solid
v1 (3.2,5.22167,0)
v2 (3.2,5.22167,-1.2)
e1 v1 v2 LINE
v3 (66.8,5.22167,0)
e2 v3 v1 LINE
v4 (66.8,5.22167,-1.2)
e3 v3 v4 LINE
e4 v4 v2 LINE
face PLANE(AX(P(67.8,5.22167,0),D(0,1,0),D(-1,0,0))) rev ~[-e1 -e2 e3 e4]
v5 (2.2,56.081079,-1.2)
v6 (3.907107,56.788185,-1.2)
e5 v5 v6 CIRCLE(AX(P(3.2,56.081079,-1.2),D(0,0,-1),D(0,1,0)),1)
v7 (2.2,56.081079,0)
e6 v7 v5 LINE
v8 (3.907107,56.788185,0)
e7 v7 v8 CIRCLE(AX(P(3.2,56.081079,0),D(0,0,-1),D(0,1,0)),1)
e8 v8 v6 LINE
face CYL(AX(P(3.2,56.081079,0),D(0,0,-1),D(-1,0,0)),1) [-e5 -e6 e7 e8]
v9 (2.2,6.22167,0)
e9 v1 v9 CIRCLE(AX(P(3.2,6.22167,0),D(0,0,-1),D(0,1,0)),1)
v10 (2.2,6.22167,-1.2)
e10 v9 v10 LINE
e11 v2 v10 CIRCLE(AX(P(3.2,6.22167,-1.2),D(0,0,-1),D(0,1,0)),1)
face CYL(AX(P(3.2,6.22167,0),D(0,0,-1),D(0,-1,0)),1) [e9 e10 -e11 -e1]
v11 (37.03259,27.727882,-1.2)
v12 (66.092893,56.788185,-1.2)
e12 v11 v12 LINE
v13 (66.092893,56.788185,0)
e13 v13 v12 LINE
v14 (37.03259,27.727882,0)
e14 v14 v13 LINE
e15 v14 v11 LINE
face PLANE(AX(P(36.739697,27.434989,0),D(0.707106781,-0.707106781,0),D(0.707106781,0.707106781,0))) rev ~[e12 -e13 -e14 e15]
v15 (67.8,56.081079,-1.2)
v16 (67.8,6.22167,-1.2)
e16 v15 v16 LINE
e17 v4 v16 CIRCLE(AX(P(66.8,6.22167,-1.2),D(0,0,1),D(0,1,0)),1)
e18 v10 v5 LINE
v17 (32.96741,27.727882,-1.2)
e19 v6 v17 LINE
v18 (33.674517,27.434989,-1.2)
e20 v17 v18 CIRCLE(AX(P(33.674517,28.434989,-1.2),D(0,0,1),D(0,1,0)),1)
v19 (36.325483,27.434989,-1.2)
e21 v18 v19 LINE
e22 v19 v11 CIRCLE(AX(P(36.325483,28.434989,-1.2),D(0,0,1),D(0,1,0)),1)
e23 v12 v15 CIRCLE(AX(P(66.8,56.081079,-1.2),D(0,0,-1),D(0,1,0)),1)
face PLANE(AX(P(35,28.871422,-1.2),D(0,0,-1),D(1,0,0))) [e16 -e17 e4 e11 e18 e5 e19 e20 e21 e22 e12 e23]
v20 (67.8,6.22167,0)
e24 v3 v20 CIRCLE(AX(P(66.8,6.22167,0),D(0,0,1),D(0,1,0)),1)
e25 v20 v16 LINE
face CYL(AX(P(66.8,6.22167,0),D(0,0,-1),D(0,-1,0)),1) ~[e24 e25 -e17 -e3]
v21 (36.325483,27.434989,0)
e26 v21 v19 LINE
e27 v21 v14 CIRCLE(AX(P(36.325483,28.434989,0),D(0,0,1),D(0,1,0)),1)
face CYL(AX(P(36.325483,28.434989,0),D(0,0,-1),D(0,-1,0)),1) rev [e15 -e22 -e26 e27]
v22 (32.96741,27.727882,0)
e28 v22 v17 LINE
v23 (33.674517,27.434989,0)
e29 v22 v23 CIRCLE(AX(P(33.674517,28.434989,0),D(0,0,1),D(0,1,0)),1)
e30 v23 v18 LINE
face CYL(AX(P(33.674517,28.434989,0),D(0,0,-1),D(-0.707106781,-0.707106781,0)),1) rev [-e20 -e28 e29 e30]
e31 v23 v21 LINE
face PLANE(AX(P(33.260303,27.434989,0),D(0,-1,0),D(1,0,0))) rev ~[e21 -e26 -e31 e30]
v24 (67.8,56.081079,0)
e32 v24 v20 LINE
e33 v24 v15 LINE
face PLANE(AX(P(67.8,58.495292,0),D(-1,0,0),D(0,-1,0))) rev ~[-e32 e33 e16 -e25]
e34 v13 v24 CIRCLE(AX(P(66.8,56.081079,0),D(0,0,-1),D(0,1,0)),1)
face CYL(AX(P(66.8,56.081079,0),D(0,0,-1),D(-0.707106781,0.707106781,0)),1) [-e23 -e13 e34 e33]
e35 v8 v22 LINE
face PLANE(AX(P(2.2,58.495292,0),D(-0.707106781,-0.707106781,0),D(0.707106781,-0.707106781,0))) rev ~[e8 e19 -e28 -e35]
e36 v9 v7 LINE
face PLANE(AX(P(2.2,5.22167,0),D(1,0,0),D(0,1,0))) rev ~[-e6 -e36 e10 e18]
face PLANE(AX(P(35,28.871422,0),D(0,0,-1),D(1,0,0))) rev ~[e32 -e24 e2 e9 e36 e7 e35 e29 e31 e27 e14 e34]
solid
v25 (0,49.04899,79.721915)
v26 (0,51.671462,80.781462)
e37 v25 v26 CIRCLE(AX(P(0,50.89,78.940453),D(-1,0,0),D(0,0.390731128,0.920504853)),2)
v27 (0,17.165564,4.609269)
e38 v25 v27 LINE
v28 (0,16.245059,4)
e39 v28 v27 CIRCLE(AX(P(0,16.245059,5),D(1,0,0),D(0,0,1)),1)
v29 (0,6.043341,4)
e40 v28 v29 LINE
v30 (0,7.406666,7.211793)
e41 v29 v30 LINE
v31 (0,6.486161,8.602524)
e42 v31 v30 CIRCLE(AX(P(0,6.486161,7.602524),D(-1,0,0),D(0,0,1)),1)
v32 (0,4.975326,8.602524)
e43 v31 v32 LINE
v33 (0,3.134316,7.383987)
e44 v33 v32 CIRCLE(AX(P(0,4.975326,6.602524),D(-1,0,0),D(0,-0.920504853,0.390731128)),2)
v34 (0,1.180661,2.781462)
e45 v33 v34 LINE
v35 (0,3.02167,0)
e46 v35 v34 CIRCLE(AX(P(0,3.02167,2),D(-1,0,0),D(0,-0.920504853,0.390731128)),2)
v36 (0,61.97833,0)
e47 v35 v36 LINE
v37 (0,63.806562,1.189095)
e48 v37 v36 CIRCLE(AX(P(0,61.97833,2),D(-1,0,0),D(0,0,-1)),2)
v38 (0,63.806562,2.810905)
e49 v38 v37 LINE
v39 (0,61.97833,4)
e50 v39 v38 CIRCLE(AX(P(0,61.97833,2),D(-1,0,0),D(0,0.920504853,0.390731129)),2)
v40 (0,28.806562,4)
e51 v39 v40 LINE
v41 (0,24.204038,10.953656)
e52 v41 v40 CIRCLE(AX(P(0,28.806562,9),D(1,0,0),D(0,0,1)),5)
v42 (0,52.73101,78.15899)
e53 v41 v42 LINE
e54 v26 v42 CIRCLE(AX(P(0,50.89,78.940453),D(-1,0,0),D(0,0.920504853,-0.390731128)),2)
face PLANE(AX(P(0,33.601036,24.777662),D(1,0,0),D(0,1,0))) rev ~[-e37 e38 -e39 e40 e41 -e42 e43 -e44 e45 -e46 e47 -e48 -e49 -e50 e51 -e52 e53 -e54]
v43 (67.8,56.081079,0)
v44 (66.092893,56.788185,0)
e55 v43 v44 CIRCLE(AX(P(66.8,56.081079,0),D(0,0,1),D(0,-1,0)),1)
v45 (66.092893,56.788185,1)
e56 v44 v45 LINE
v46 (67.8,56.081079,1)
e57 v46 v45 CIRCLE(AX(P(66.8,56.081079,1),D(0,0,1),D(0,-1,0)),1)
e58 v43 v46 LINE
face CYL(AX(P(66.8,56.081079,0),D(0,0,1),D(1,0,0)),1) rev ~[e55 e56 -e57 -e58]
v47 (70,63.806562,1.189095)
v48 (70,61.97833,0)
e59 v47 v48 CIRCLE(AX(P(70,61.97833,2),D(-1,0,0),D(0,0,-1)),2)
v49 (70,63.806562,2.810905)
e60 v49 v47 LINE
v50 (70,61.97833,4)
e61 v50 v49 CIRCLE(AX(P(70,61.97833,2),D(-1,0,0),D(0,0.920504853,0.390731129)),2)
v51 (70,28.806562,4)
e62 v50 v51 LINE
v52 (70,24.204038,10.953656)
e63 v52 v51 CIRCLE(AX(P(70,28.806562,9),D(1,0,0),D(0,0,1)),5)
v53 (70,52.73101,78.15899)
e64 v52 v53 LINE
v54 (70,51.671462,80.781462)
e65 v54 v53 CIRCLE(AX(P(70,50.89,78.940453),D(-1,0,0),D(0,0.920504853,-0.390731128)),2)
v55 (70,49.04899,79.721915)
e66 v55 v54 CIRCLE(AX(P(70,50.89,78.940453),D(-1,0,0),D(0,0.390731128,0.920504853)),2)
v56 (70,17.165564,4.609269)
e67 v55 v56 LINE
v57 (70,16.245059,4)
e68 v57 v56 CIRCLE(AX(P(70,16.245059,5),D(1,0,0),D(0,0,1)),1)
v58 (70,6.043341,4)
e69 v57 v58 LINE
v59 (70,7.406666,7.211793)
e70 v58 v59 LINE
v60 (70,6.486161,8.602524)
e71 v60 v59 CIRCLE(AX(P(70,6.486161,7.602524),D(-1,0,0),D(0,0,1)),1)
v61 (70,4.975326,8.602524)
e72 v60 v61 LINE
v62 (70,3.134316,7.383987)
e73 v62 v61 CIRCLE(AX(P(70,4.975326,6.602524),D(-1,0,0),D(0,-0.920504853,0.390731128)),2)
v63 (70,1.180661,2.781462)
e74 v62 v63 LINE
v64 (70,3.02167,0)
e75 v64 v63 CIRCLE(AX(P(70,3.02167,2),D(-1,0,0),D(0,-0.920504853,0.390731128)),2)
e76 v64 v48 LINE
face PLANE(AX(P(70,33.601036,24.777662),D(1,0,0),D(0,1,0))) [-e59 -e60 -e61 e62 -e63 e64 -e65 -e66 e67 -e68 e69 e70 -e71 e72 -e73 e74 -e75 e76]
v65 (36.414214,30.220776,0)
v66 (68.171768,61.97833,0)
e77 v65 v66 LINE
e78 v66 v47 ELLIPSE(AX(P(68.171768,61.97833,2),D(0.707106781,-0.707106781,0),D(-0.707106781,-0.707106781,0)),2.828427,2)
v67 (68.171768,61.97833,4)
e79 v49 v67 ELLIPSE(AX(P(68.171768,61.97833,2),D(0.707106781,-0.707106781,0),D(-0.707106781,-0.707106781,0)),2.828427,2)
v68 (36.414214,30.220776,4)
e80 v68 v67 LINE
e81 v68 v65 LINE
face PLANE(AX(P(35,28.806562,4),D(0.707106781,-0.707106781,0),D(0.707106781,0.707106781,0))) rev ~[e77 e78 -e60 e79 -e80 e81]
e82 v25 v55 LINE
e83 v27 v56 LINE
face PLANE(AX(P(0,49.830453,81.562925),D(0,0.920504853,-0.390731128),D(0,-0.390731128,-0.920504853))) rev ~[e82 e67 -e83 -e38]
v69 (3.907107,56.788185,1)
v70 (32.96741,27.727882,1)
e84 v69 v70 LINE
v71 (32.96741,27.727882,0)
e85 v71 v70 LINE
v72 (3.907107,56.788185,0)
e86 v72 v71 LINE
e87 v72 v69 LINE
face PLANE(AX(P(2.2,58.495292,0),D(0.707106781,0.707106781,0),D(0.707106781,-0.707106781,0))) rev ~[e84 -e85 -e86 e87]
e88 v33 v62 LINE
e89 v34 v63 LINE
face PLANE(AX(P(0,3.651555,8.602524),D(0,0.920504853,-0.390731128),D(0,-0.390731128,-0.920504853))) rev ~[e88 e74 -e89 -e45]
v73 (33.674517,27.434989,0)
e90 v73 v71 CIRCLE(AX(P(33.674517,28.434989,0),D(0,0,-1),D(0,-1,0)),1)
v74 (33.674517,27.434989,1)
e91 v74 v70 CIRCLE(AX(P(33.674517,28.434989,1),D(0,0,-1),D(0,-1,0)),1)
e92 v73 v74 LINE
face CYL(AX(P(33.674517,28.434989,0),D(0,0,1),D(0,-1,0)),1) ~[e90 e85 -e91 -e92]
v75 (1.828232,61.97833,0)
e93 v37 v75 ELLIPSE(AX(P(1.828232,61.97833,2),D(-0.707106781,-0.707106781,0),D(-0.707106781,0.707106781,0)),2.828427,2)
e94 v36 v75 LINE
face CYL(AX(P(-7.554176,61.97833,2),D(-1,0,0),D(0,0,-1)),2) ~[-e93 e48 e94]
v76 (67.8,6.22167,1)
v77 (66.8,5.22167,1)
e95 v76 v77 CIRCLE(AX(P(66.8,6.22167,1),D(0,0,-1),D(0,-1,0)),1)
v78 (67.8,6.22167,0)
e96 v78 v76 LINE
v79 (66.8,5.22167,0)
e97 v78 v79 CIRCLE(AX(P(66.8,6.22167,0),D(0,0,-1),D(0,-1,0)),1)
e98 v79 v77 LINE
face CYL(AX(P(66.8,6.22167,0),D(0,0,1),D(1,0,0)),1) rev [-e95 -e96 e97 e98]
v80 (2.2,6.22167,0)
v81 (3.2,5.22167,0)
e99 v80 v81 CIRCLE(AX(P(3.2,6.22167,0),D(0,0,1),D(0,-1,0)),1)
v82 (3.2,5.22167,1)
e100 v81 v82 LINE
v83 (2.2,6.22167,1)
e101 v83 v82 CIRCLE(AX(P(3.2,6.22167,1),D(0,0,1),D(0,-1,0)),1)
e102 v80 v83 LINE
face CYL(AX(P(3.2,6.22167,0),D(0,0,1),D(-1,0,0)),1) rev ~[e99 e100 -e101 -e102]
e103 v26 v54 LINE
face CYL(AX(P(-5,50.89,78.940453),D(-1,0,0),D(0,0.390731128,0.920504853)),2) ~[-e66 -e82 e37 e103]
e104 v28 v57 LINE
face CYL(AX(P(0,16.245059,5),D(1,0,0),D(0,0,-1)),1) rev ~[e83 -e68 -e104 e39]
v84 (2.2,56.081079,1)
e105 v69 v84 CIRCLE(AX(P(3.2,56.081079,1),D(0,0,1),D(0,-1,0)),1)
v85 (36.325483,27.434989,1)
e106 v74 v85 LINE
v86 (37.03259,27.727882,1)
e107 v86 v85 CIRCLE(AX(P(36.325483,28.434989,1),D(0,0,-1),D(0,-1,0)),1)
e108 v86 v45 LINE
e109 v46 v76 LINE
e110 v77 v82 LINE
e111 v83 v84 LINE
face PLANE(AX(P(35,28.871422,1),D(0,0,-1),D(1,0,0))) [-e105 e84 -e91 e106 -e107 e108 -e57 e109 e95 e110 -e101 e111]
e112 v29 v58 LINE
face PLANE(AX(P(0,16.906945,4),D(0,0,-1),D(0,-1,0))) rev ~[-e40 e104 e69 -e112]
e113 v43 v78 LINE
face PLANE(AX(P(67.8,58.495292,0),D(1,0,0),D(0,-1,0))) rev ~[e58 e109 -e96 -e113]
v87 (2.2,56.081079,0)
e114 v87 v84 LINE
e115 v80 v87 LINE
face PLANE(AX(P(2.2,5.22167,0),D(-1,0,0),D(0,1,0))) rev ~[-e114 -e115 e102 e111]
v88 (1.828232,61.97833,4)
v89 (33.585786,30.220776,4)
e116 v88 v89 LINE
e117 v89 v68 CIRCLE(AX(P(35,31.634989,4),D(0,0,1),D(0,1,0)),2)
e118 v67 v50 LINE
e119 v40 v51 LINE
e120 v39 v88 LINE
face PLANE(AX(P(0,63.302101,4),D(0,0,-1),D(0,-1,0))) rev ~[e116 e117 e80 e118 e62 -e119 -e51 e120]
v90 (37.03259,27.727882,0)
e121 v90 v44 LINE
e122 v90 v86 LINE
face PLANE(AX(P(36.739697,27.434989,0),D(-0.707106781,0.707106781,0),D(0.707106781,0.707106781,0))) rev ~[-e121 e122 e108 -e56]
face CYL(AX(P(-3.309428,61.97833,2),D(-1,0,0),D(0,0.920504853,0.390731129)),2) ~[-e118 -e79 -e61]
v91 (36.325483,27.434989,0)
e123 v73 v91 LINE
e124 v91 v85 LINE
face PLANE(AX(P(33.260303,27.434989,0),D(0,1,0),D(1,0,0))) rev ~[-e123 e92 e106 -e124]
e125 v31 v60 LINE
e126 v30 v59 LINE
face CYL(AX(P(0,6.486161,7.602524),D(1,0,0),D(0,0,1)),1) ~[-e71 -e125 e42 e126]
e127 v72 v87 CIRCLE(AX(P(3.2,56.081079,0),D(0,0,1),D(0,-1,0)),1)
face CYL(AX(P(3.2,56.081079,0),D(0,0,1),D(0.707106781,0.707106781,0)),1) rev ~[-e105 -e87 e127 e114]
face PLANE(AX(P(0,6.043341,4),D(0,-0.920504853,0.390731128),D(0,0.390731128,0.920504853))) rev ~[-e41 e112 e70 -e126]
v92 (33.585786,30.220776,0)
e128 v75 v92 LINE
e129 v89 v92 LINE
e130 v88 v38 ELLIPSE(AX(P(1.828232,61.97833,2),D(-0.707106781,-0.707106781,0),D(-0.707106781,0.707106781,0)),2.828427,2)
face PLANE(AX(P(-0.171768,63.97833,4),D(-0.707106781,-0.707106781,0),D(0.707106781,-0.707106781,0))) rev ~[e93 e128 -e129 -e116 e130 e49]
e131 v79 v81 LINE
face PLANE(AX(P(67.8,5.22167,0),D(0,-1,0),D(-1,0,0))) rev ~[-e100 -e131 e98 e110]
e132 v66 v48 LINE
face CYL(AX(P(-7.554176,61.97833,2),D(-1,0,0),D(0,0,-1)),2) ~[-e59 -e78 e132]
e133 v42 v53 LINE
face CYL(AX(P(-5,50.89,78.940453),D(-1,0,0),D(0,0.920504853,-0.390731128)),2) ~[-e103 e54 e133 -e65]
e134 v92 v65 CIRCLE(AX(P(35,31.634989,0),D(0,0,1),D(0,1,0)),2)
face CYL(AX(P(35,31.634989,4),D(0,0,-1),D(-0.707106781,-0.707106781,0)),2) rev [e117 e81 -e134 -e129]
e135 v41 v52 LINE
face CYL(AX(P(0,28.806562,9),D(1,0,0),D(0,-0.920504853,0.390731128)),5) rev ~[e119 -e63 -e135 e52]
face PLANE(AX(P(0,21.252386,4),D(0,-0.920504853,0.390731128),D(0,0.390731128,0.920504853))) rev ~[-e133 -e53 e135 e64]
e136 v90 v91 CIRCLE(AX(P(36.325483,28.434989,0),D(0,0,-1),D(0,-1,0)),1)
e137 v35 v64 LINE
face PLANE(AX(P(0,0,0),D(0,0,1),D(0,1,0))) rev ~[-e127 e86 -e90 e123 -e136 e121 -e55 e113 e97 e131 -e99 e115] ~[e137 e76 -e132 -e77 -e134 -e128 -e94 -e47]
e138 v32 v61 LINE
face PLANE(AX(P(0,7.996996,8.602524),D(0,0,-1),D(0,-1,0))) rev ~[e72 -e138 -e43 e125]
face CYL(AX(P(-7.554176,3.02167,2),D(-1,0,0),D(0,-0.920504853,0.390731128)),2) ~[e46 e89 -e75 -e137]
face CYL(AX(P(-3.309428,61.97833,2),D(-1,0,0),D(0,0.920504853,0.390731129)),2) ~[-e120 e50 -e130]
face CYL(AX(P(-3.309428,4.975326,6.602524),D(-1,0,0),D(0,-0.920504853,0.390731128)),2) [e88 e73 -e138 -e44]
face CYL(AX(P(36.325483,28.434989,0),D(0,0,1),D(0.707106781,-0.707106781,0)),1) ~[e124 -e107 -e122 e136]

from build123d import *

# Parameters (mm, degrees)
F1_DEPTH    = 70
F2_T1_DEPTH = 80
F2_T3_DEPTH = 76.618855612
F2_T5_DEPTH = 85.1083519361
F3_R        = 1
F4_R        = 5
F6_DEPTH    = 4
F7_R        = 2
F9_DEPTH    = 1
F10_DEPTH   = 1.2
F11_R       = 1
F11_2_R     = 1


# Not quite as in the source:
# - a fillet or chamfer that OpenCascade refuses, or shapes differently, is made with other operations: its cross-section is extruded or revolved along the edge and cut away or added
# - two fillets or chamfers of one size are made in one step


with BuildPart() as f1:
    # F0 (on Right) → F1 (new body)
    with BuildSketch(Plane.YZ):
        Polygon((3.6515549073, 8.6025242673), (0, 0), (65, 0), (63.3021007352, 4), (21.2523860581, 4), (53.5124720901, 80), (49.8304526763, 81.562924514), (16.9069445485, 4), (6.0433407745, 4), (7.9969964169, 8.6025242673), align=None)
    extrude(amount=F1_DEPTH)

    # F2: fillet of radius 2 on 6 edges, made by hand

    # F2_s2 → F2_t1 (cut)
    with BuildSketch(Plane.YZ.offset(-5)):
        with BuildLine():
            ThreePointArc((51.6714623832, 80.781462257), (50.1407869393, 80.7948202592), (49.0489904193, 79.7219148071))
            Line((49.0489904193, 79.7219148071), (49.8304526763, 81.562924514))
            Line((49.8304526763, 81.562924514), (51.6714623832, 80.781462257))
        make_face()
        with BuildLine():
            ThreePointArc((52.7310098331, 78.1589902931), (52.7443678353, 79.6896657369), (51.6714623832, 80.781462257))
            Line((51.6714623832, 80.781462257), (53.5124720901, 80))
            Line((53.5124720901, 80), (52.7310098331, 78.1589902931))
        make_face()
    extrude(amount=F2_T1_DEPTH, mode=Mode.SUBTRACT)

    # F2_s4 → F2_t3 (cut)
    with BuildSketch(Plane.YZ.offset(-3.309427806)):
        with BuildLine():
            ThreePointArc((3.1343163228, 7.3839865242), (3.8714520591, 8.2702959114), (4.9753260297, 8.6025242673))
            Line((4.9753260297, 8.6025242673), (3.6515549073, 8.6025242673))
            Line((3.6515549073, 8.6025242673), (3.1343163228, 7.3839865242))
        make_face()
        with BuildLine():
            ThreePointArc((63.8193393197, 2.781462257), (63.0822035834, 3.6677716441), (61.9783296128, 4))
            Line((61.9783296128, 4), (63.3021007352, 4))
            Line((63.3021007352, 4), (63.8193393197, 2.781462257))
        make_face()
    extrude(amount=F2_T3_DEPTH, mode=Mode.SUBTRACT)

    # F2_s6 → F2_t5 (cut)
    with BuildSketch(Plane.YZ.offset(-7.5541759681)):
        with BuildLine():
            ThreePointArc((1.1806606803, 2.781462257), (1.3538987431, 0.8961260294), (3.0216703872, 0))
            Line((3.0216703872, 0), (0, 0))
            Line((0, 0), (1.1806606803, 2.781462257))
        make_face()
        with BuildLine():
            ThreePointArc((61.9783296128, 0), (63.6461012569, 0.8961260294), (63.8193393197, 2.781462257))
            Line((63.8193393197, 2.781462257), (65, 0))
            Line((65, 0), (61.9783296128, 0))
        make_face()
    extrude(amount=F2_T5_DEPTH, mode=Mode.SUBTRACT)

    # F3
    f3_edges = [f1.edges().sort_by_distance(p)[0] for p in [
        (35, 7.996996, 8.602524),
        (35, 16.906945, 4),
    ]]
    fillet(f3_edges, radius=F3_R)

    # F4
    f4_edges = [f1.edges().sort_by_distance(p)[0] for p in [
        (35, 21.252386, 4),
    ]]
    fillet(f4_edges, radius=F4_R)

    # F5 (on face) → F6 (cut, through all)
    with BuildSketch(Plane.XY.offset(4)):
        Polygon((1.8282324134, 61.9783296128), (35, 28.8065620262), (68.1717675866, 61.9783296128), (70.1717675866, 63.9783296128), (-0.1717675866, 63.9783296128), align=None)
    extrude(amount=-F6_DEPTH, mode=Mode.SUBTRACT)

    # F7
    f7_edges = [f1.edges().sort_by_distance(p)[0] for p in [
        (35, 28.806562, 2),
    ]]
    fillet(f7_edges, radius=F7_R)

    # F8 (on face) → F9 (cut)
    with BuildSketch(Plane(origin=(0, 0, 0), x_dir=(1, 0, 0), z_dir=(0, 0, -1))):
        Polygon((67.8, -5.2216703872), (2.2, -5.2216703872), (2.2, -58.495292189), (33.260303038, -27.434989151), (36.739696962, -27.434989151), (67.8, -58.495292189), align=None)
    extrude(amount=-F9_DEPTH, mode=Mode.SUBTRACT)

    # F11#2
    f11_2_edges = [f1.edges().sort_by_distance(p)[0] for p in [
        (67.8, 58.495292, 0.5),
        (67.8, 5.22167, 0.5),
        (2.2, 5.22167, 0.5),
        (2.2, 58.495292, 0.5),
        (33.260303, 27.434989, 0.5),
        (36.739697, 27.434989, 0.5),
    ]]
    fillet(f11_2_edges, radius=F11_2_R)


with BuildPart() as f10:
    # F8 (on face) → F10 (new body)
    with BuildSketch(Plane(origin=(0, 0, 0), x_dir=(1, 0, 0), z_dir=(0, 0, -1))):
        Polygon((67.8, -5.2216703872), (2.2, -5.2216703872), (2.2, -58.495292189), (33.260303038, -27.434989151), (36.739696962, -27.434989151), (67.8, -58.495292189), align=None)
    extrude(amount=F10_DEPTH)

    # F11
    f11_edges = [f10.edges().sort_by_distance(p)[0] for p in [
        (2.2, 5.22167, -0.6),
        (33.260303, 27.434989, -0.6),
        (36.739697, 27.434989, -0.6),
        (67.8, 5.22167, -0.6),
        (67.8, 58.495292, -0.6),
        (2.2, 58.495292, -0.6),
    ]]
    fillet(f11_edges, radius=F11_R)


solid = Compound([f1.part, f10.part])
